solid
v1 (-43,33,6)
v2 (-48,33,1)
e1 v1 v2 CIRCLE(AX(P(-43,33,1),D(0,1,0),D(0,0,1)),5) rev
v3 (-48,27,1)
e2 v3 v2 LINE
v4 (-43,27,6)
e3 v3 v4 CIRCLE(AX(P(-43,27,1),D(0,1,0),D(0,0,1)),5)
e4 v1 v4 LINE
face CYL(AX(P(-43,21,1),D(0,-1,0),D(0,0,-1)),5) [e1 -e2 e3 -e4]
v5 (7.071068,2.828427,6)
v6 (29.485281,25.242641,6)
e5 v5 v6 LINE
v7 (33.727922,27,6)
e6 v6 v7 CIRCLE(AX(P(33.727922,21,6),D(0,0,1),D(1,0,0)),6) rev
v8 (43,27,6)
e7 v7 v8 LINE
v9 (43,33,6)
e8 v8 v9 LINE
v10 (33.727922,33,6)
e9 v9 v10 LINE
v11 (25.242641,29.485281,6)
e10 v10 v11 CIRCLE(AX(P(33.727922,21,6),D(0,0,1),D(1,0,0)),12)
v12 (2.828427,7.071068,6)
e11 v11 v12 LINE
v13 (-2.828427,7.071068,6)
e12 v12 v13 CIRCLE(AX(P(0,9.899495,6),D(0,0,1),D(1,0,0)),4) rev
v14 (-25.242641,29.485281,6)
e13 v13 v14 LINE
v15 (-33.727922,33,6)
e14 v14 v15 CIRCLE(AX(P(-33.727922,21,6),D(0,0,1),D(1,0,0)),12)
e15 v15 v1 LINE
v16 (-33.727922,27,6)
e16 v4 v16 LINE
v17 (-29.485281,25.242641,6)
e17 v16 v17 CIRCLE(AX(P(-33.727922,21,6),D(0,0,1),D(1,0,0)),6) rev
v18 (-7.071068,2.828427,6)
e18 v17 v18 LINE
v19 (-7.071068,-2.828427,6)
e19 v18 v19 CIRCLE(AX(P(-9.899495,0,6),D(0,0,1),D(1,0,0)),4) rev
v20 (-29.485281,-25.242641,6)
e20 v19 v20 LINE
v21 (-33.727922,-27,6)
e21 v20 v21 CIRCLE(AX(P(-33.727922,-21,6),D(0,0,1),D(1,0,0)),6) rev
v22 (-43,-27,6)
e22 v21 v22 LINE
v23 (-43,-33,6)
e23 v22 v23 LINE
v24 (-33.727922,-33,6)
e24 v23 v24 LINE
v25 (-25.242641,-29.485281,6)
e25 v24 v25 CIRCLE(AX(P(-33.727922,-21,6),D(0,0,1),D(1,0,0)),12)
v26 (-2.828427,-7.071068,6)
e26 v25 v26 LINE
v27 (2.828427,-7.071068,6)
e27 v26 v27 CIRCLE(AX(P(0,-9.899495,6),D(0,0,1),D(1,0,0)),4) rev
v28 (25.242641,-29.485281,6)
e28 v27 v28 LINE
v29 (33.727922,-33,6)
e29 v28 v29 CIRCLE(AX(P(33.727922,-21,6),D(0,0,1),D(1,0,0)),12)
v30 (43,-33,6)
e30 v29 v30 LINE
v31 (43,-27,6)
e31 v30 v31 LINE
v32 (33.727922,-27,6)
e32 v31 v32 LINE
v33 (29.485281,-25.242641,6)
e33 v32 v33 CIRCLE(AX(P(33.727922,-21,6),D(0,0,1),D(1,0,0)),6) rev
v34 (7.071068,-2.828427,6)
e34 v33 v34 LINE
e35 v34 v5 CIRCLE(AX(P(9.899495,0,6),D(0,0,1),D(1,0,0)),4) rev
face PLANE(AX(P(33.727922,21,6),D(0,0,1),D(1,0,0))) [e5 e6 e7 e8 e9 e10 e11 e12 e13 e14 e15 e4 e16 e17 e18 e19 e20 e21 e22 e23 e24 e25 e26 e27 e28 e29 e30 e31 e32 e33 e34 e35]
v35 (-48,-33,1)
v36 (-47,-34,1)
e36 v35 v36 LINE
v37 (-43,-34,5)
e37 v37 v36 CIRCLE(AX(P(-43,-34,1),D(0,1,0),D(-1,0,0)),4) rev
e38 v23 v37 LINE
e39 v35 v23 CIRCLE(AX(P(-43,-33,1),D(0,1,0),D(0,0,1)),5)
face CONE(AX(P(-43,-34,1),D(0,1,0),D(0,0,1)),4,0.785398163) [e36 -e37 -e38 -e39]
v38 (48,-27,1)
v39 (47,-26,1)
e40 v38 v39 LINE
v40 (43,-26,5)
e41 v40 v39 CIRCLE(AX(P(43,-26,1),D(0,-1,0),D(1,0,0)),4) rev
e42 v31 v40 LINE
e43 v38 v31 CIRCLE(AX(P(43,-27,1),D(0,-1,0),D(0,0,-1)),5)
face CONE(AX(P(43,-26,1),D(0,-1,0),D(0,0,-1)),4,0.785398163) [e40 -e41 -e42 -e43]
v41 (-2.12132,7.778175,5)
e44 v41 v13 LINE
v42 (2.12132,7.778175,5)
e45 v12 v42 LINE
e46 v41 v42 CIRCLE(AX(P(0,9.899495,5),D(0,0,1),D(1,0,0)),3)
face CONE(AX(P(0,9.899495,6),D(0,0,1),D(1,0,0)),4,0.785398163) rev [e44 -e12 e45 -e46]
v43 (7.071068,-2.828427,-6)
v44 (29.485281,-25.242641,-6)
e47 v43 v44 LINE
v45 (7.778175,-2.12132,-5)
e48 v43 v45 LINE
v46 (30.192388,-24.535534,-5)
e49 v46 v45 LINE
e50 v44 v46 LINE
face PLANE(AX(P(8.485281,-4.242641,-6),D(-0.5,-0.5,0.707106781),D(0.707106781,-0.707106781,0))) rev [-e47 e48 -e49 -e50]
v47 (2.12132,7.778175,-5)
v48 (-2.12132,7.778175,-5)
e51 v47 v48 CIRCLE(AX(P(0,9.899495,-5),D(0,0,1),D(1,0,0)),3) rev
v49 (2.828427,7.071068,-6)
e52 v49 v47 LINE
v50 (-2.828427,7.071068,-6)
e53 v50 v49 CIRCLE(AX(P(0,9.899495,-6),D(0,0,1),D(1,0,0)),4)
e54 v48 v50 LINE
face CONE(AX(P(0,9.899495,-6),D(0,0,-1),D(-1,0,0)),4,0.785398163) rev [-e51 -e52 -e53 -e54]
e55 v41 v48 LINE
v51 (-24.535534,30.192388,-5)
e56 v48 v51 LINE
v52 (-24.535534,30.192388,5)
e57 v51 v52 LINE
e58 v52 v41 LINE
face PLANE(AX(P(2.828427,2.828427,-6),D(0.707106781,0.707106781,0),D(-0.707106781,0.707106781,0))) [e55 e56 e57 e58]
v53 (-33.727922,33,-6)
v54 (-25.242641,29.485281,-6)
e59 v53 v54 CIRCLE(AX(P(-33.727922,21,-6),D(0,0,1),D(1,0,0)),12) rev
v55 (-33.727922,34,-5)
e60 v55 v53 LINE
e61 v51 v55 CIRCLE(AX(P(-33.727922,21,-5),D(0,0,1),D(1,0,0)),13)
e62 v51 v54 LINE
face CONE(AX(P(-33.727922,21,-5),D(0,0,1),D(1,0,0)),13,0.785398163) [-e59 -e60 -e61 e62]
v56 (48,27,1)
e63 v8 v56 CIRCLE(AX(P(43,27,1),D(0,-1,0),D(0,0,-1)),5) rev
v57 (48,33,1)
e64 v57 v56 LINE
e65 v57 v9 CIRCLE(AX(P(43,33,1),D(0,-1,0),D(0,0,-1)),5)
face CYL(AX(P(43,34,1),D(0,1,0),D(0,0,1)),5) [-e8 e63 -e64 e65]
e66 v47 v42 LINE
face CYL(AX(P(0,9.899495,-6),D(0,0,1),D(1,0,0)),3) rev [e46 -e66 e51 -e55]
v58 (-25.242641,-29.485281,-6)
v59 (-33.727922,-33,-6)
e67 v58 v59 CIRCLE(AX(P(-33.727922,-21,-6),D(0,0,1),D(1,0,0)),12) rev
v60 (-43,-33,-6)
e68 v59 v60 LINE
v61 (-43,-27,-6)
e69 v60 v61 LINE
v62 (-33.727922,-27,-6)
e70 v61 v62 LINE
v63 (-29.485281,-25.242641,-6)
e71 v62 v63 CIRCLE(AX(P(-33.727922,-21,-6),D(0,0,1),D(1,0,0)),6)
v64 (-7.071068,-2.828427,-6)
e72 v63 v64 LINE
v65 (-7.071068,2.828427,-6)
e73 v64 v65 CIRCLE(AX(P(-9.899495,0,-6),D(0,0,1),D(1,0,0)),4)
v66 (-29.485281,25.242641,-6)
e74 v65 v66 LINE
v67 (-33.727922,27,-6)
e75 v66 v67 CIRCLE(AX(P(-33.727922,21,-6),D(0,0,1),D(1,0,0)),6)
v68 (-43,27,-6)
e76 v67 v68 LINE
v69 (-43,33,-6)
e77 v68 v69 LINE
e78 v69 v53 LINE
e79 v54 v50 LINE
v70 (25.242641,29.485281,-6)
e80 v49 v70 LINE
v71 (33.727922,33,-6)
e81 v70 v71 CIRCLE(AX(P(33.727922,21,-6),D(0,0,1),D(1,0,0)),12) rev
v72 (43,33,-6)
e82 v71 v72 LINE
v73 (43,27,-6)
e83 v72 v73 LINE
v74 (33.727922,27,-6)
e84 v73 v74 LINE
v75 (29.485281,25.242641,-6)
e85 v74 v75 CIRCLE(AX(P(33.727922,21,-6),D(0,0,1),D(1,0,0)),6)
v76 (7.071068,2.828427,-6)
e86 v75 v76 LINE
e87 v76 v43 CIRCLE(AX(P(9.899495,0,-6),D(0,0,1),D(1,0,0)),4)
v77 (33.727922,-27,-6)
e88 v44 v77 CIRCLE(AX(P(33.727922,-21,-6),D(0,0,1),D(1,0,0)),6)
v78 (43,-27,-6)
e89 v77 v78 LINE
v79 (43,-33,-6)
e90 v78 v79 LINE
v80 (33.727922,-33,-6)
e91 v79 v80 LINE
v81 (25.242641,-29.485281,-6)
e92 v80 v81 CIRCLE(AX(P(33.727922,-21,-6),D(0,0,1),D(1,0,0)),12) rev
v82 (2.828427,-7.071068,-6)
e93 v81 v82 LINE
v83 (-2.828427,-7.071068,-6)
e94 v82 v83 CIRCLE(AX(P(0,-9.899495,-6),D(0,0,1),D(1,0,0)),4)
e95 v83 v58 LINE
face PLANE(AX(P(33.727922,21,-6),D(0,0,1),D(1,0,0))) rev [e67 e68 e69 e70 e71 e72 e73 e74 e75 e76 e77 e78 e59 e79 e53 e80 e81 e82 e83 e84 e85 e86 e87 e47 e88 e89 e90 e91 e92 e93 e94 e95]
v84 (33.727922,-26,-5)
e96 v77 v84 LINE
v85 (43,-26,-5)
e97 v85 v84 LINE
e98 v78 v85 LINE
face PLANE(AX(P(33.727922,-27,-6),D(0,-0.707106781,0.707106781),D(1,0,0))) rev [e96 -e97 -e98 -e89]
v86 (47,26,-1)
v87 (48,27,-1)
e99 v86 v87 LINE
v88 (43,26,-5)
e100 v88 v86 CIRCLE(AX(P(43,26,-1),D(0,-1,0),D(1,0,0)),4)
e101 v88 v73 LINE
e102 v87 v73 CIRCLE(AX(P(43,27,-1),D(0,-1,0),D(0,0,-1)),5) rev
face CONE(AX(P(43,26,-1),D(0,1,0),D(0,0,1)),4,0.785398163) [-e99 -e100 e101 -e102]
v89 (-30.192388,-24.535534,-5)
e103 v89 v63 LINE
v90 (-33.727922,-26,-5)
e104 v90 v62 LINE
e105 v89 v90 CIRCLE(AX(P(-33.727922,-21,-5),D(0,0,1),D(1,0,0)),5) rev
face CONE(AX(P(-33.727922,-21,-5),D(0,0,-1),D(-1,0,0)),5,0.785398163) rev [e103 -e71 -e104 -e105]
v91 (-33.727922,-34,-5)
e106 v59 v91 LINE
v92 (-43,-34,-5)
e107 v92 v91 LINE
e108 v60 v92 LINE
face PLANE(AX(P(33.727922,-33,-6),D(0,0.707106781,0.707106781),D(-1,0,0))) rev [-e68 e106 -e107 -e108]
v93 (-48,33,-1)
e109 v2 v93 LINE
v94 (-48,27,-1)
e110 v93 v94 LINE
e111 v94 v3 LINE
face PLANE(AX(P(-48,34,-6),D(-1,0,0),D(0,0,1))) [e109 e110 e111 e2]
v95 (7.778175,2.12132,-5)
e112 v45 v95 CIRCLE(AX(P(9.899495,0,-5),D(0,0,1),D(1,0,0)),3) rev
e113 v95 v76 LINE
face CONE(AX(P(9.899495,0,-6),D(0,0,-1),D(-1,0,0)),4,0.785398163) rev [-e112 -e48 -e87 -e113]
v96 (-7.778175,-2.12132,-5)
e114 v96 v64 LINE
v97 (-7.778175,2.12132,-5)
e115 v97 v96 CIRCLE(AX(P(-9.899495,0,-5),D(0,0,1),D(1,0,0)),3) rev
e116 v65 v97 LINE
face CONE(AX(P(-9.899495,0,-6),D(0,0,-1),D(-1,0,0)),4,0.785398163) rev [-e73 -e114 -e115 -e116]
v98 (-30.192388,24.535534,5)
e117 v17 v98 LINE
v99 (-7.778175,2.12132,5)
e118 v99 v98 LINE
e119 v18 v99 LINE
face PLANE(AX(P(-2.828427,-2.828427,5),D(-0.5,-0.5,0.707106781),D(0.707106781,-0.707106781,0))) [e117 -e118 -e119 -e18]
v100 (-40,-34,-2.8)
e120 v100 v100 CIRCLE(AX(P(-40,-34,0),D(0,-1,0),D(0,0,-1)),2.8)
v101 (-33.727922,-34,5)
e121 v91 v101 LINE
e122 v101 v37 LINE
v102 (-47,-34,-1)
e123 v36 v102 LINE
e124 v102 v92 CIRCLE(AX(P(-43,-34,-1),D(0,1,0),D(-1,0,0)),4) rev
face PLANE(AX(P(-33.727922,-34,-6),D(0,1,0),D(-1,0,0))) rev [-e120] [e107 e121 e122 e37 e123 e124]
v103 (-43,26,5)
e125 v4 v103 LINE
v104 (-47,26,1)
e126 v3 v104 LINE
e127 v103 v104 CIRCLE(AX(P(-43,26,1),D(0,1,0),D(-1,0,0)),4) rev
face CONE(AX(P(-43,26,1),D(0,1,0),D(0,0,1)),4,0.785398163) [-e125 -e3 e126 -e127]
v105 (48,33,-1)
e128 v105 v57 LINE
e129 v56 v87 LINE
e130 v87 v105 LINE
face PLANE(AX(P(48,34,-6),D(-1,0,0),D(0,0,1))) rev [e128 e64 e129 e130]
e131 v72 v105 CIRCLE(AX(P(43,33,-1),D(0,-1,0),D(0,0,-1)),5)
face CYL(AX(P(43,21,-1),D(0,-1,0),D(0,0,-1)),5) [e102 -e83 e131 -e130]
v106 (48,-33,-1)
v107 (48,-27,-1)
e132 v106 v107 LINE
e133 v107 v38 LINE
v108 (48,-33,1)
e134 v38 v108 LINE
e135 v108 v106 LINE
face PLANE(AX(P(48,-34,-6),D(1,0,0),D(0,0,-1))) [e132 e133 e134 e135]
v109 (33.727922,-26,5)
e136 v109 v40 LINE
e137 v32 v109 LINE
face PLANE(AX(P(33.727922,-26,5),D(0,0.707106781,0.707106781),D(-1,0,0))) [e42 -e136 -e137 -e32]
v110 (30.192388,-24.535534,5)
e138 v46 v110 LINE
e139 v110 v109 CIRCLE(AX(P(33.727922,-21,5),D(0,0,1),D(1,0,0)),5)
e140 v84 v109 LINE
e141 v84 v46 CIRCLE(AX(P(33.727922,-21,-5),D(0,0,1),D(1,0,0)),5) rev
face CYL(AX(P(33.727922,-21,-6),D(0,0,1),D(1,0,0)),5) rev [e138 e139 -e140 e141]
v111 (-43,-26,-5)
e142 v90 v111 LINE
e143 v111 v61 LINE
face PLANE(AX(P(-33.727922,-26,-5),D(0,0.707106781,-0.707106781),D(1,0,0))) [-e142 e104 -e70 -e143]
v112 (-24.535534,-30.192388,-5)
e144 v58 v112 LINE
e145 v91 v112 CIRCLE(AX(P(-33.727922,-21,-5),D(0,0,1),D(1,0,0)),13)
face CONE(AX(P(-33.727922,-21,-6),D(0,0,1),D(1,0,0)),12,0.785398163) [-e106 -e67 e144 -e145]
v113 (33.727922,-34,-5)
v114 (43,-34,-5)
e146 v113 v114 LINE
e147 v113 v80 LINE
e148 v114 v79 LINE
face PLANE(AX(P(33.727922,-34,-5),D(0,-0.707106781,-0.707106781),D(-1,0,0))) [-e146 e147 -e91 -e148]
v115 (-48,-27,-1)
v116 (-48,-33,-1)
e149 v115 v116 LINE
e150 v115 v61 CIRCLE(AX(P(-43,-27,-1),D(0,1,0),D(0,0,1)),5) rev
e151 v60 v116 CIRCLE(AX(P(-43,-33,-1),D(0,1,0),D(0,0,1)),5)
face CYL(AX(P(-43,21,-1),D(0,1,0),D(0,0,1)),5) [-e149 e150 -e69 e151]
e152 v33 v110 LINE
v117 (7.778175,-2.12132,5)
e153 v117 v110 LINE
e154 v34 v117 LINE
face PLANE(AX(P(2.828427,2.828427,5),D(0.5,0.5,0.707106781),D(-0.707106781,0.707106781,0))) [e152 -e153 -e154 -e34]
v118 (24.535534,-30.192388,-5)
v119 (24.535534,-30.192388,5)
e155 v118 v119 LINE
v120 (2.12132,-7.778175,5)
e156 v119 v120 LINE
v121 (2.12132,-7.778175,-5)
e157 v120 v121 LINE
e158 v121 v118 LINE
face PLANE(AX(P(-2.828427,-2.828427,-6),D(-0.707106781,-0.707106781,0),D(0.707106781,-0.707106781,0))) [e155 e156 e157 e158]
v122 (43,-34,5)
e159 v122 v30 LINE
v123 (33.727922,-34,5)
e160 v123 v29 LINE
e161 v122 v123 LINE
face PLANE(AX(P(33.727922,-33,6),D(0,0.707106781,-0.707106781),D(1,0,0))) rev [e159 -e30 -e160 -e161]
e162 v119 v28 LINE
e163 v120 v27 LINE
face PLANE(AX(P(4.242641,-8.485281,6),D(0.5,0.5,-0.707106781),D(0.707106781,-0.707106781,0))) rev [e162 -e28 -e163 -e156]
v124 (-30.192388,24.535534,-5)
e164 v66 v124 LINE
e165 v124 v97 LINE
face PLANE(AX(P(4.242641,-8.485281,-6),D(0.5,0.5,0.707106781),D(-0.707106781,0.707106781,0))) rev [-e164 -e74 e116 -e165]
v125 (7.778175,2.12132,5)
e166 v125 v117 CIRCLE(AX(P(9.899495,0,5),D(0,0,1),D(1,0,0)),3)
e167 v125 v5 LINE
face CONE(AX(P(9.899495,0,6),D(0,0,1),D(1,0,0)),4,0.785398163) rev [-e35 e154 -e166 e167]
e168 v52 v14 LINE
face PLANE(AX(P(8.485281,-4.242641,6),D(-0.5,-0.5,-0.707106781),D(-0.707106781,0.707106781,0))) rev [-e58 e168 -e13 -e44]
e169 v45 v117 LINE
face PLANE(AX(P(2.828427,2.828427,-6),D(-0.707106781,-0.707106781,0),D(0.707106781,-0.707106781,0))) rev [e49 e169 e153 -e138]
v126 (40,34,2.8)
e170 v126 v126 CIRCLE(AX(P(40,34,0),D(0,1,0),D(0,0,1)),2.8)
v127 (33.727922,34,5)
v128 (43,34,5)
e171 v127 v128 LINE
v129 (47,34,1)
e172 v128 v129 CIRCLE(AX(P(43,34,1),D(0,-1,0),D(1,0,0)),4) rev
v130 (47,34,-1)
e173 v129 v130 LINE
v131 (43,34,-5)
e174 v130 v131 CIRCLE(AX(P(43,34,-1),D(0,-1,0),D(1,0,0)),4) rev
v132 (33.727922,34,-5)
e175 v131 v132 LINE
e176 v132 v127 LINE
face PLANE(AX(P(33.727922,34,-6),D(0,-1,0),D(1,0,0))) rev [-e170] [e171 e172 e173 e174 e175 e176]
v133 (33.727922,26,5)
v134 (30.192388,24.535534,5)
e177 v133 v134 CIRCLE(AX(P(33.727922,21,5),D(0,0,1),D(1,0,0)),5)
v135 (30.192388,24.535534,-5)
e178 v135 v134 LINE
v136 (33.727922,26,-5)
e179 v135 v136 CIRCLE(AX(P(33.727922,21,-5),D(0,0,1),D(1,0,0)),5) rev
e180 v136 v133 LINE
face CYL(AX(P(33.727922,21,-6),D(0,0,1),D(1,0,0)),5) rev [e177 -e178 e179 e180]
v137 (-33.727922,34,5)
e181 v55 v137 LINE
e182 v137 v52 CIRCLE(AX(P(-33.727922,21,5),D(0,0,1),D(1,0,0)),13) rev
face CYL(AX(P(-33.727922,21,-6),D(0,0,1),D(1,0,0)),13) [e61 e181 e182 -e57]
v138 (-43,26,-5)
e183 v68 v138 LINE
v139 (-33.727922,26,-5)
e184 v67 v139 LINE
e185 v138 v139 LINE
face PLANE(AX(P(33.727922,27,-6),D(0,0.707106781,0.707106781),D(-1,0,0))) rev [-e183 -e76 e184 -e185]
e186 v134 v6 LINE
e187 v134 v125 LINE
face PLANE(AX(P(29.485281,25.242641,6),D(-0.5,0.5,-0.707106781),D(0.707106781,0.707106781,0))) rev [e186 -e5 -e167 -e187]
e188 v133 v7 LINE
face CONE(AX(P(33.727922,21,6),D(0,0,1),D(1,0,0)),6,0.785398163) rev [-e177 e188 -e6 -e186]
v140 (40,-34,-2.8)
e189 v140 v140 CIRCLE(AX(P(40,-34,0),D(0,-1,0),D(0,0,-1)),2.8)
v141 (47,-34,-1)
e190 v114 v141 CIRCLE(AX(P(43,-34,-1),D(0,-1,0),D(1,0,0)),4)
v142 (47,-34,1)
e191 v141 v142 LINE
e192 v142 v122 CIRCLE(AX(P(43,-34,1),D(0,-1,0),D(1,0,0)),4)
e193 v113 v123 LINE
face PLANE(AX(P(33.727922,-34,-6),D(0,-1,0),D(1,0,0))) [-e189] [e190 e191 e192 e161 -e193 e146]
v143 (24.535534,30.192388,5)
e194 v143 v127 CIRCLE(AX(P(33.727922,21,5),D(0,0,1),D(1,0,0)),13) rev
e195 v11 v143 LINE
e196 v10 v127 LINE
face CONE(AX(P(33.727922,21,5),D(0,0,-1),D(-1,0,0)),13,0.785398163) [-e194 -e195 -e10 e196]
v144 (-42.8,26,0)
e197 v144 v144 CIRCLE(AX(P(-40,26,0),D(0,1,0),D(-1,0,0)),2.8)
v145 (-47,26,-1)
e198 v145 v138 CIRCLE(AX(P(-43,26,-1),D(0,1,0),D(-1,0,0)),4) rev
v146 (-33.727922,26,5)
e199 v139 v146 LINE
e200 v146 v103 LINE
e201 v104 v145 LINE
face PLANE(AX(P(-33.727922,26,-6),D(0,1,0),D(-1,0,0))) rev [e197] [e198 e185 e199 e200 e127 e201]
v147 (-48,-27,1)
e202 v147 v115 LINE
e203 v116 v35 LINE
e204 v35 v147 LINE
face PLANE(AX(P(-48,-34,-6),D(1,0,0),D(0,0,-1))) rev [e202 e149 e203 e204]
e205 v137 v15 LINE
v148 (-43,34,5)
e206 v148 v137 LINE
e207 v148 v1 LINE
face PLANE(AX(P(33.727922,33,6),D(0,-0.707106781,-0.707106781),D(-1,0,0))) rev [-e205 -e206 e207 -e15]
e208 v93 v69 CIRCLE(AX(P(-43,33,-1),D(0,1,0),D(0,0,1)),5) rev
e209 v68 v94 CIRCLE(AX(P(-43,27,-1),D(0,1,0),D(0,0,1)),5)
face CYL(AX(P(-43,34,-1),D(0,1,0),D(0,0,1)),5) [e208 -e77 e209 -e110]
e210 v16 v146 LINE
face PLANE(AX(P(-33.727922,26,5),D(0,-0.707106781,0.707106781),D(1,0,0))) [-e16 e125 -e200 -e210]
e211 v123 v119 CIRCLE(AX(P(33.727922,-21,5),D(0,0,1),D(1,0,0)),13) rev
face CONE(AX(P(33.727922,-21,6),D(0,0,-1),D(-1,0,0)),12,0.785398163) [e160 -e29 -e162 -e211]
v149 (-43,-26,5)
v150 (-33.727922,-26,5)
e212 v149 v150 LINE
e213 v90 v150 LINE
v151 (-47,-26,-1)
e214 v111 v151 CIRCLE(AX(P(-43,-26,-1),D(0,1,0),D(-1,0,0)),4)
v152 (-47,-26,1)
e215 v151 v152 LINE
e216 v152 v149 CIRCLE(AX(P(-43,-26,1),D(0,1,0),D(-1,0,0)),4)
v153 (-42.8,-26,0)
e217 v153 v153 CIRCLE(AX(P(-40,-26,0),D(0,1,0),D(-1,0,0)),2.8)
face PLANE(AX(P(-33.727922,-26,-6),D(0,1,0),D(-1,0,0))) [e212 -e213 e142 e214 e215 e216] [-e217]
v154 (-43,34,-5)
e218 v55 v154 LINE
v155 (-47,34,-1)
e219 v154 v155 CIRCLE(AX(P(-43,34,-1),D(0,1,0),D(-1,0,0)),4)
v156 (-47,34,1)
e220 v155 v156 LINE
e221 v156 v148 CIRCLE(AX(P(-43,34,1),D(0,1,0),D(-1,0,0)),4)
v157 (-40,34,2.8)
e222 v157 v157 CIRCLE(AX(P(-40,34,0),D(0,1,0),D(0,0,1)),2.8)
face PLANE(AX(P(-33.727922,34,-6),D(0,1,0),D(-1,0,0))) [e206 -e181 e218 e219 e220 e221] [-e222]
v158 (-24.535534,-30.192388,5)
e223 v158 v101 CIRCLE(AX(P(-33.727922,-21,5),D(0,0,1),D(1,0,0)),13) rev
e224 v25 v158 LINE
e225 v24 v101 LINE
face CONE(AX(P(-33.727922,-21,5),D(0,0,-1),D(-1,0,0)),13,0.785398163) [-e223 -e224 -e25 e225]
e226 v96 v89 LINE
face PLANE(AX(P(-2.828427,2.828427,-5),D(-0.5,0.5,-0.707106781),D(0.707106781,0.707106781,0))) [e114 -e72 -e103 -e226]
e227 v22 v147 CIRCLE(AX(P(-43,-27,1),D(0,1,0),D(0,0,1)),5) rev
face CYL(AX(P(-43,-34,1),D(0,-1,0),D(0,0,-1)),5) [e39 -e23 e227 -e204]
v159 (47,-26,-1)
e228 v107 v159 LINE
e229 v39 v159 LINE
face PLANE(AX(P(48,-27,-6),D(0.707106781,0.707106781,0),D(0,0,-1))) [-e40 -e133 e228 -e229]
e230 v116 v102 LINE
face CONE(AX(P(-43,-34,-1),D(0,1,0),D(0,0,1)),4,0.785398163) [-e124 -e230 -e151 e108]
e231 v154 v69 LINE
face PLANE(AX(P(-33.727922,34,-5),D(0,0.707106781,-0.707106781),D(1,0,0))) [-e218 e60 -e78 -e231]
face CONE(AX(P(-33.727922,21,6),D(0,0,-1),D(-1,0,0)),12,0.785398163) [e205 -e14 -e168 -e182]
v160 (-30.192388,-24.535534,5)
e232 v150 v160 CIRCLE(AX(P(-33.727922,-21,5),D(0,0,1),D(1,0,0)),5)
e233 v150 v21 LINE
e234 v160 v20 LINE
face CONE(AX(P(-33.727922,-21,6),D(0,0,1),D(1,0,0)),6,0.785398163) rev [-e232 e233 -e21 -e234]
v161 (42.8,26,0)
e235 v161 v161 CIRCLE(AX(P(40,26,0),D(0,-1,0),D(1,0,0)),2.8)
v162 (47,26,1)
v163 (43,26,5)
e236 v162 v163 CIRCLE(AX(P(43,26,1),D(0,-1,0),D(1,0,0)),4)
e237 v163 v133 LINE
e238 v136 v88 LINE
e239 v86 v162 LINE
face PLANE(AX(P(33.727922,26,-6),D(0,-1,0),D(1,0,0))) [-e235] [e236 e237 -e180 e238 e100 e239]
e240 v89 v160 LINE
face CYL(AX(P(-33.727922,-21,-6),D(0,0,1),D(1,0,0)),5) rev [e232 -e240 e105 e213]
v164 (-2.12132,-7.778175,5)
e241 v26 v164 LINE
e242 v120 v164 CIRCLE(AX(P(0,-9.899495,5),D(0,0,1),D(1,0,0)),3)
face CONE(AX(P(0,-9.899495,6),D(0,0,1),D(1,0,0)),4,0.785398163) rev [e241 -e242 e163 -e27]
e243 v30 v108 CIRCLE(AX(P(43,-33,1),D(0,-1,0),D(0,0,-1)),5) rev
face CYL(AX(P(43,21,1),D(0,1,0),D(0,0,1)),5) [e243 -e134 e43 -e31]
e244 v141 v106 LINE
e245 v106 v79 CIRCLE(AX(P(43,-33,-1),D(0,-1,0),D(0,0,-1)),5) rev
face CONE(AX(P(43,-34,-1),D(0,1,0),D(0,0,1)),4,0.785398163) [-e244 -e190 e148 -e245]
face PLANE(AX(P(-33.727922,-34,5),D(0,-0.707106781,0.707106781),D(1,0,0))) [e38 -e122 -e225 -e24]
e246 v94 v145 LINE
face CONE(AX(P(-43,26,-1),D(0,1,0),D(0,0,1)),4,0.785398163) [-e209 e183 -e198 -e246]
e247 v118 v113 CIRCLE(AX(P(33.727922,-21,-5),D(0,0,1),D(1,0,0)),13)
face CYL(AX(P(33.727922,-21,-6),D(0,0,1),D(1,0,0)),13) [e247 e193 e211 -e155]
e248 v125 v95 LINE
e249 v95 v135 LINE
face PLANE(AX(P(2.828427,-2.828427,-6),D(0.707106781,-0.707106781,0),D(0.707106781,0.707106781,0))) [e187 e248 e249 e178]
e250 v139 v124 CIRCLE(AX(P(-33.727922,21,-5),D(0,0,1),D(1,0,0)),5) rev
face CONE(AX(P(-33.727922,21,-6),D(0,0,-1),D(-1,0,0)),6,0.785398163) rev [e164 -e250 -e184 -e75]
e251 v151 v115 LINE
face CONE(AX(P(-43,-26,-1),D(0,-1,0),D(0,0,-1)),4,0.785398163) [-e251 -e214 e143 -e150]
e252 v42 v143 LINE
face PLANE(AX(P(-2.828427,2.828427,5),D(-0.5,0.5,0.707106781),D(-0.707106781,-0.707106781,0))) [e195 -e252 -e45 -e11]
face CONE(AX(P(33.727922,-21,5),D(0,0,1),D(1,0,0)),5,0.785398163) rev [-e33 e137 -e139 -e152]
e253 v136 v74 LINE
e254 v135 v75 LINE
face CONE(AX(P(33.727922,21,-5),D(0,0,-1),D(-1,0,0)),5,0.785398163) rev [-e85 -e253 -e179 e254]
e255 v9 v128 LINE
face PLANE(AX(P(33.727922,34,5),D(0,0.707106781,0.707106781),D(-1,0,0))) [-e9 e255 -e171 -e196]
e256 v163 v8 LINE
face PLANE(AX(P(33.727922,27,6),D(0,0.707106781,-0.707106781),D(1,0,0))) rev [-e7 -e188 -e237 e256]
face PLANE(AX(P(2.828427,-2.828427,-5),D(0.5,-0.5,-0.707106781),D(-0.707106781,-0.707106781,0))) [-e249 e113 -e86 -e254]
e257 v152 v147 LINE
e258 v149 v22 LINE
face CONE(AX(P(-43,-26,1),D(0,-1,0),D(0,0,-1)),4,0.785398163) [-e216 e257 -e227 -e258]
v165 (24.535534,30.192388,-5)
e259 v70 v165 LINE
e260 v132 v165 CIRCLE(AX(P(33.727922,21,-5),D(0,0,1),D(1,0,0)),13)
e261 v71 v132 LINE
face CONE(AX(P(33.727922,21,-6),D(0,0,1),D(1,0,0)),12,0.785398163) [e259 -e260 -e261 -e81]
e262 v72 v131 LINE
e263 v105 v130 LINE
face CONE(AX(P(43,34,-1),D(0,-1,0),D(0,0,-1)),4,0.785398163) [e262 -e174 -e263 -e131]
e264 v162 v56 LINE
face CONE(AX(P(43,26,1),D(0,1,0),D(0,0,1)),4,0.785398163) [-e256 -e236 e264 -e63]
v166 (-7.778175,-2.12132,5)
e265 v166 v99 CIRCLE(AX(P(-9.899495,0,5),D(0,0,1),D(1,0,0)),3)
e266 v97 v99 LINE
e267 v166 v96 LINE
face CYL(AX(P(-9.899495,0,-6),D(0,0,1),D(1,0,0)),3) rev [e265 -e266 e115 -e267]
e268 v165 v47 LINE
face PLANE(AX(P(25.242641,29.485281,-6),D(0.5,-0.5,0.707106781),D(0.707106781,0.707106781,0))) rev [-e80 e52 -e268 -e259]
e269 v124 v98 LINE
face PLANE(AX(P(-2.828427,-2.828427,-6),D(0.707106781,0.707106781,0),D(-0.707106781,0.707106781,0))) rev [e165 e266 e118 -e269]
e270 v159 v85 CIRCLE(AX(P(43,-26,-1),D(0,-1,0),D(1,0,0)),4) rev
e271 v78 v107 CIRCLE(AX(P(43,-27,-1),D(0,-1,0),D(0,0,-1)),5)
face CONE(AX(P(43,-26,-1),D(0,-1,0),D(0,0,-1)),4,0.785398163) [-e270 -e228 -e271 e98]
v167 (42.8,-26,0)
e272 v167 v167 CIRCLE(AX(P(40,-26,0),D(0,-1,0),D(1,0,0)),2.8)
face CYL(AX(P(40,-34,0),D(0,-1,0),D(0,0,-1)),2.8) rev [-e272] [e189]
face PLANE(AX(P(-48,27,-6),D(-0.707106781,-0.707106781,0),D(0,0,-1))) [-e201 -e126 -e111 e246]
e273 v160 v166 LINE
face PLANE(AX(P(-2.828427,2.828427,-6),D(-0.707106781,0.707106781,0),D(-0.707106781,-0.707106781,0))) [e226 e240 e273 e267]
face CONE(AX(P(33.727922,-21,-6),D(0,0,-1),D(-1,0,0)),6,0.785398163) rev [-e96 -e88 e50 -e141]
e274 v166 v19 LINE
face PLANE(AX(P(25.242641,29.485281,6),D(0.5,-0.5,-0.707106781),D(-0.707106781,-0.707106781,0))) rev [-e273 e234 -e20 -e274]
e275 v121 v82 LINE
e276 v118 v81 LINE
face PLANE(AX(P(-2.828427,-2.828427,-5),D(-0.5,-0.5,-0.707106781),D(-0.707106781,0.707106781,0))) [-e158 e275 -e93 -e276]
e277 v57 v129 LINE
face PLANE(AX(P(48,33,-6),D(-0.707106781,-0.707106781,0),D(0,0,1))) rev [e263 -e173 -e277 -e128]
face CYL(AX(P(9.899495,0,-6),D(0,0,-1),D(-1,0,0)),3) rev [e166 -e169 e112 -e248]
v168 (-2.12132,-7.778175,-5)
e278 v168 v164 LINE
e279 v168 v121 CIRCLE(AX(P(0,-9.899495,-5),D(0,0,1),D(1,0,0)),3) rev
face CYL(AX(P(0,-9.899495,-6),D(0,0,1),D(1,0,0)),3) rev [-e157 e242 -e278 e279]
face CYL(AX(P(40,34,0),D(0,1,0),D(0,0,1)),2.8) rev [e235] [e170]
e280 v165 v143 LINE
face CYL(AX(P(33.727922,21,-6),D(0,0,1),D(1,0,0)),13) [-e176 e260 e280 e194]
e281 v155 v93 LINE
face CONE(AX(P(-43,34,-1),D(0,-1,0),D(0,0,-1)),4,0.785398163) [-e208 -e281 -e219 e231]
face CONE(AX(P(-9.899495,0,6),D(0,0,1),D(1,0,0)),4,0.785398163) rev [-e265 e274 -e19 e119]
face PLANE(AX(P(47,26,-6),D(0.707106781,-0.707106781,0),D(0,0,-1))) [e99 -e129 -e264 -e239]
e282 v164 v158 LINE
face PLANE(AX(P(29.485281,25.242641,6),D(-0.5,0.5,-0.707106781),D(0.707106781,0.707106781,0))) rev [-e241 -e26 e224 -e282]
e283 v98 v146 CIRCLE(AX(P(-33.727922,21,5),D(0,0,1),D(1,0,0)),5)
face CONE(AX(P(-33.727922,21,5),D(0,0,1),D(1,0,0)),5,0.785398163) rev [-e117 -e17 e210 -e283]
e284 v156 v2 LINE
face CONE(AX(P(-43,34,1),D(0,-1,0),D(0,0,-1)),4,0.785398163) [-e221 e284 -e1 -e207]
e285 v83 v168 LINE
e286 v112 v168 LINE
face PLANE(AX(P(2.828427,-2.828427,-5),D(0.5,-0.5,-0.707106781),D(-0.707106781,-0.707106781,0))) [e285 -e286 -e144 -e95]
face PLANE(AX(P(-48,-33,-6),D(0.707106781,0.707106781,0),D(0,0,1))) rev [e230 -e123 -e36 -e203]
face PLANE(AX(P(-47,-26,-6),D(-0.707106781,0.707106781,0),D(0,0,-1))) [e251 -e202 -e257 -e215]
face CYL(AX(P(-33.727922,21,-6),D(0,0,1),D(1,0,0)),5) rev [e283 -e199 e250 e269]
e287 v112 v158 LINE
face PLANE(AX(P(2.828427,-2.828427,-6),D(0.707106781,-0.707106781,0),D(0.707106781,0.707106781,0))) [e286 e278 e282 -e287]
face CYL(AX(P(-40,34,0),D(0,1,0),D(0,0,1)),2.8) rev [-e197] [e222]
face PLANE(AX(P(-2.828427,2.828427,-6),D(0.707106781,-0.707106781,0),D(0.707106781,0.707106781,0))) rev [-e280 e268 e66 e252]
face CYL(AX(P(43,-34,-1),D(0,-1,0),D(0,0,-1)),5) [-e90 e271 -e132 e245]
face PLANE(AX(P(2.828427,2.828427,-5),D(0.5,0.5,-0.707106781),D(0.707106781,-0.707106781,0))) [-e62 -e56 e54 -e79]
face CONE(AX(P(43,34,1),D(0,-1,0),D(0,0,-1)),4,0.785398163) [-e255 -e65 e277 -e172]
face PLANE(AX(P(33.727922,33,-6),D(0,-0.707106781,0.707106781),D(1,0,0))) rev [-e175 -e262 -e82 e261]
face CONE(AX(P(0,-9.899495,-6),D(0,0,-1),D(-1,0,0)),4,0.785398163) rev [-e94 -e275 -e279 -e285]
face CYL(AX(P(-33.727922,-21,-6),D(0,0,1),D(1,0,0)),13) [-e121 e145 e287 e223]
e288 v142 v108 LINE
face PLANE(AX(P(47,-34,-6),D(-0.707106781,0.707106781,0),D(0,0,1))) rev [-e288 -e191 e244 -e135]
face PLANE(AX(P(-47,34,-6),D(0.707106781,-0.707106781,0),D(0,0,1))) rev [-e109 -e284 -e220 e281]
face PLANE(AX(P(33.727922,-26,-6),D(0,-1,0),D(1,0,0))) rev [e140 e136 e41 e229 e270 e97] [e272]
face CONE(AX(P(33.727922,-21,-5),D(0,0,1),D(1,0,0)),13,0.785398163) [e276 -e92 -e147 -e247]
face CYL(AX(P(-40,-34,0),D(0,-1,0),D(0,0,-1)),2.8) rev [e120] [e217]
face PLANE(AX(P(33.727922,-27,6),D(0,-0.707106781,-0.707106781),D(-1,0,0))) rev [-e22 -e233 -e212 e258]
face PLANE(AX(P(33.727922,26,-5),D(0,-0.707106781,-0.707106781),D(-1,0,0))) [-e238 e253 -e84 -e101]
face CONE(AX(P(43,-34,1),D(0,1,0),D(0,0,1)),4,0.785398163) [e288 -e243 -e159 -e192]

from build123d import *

# Parameters (mm, degrees)
EXTRUIR_L_MINA1_DEPTH    = 6
TALADRO1_D               = 5.6
TALADRO1_DEPTH           = 68
REDONDEO1_R              = 5
REDONDEO1_OF_SIMETR_A1_R = 5
REDONDEO3_R              = 3
CHAFL_N4_SIZE            = 1


# Read off the part's stored shape, not the designer's step: Simetría2
with BuildPart() as part:
    # Croquis1 → Extruir-Lámina1 (new, symmetric)
    with BuildSketch(Plane.XY):
        with BuildLine():
            Line((2.828427125, -2.828427125), (30.192388155, 24.535533906))
            ThreePointArc((30.192388155, 24.535533906), (31.8145049, 25.619397663), (33.727922061, 26))
            Line((33.727922061, 26), (48, 26))
            Line((48, 26), (48, 34))
            Line((48, 34), (33.727922061, 34))
            ThreePointArc((33.727922061, 34), (28.753037441, 33.010433923), (24.535533906, 30.192388155))
            Line((24.535533906, 30.192388155), (-2.828427125, 2.828427125))
            Line((-2.828427125, 2.828427125), (2.828427125, -2.828427125))
        make_face()
    extruir_l_mina1 = extrude(amount=EXTRUIR_L_MINA1_DEPTH, both=True)

    # Taladro1
    with Locations(Plane(origin=(0, 34, 0), x_dir=(1, 0, 0), z_dir=(0, 1, 0))):
        with Locations((40, 0)):
            taladro1 = Hole(TALADRO1_D / 2, depth=TALADRO1_DEPTH)

    # Redondeo1
    redondeo1_edges = [part.edges().sort_by_distance(p)[0] for p in [
        (48, 30, 6),
        (48, 30, -6),
    ]]
    fillet(redondeo1_edges, radius=REDONDEO1_R)

    # Simetría1: Extruir-Lámina1, Taladro1 across plane
    add(extruir_l_mina1.mirror(Plane(origin=(0, 0, 0), x_dir=(0, 0, 1), z_dir=(1, 0, 0))))
    add(taladro1.mirror(Plane(origin=(0, 0, 0), x_dir=(0, 0, 1), z_dir=(1, 0, 0))), mode=Mode.SUBTRACT)

    # Redondeo1 of Simetría1
    redondeo1_of_simetr_a1_edges = [part.edges().sort_by_distance(p)[0] for p in [
        (-48, 30, 6),
        (-48, 30, -6),
    ]]
    fillet(redondeo1_of_simetr_a1_edges, radius=REDONDEO1_OF_SIMETR_A1_R)

    # Simetría2: part across plane


with BuildPart() as part_1:
    add(part.part)
    add(part.part.mirror(Plane.ZX))

    # Redondeo3
    redondeo3_edges = [part_1.edges().sort_by_distance(p)[0] for p in [
        (-5.656854249, 0, 0),
        (5.656854249, 0, 0),
        (0, -5.656854249, 0),
        (0, 5.656854249, 0),
    ]]
    fillet(redondeo3_edges, radius=REDONDEO3_R)

    # Chaflán4
    chafl_n4_edges = [part_1.edges().sort_by_distance(p)[0] for p in [
        (38.363961031, 34, -6),
        (-38.363961031, -26, -6),
        (-31.8145049, -25.619397663, -6),
        (-28.753037441, -33.010433923, 6),
        (-38.363961031, -34, 6),
        (-28.753037441, -33.010433923, -6),
        (-38.363961031, -34, -6),
        (-31.8145049, -25.619397663, 6),
        (-38.363961031, -26, 6),
        (28.753037441, 33.010433923, -6),
        (-48, -26, 0),
        (-46.535533906, -26, 4.535533906),
        (-46.535533906, -26, -4.535533906),
        (-48, -34, 0),
        (-46.535533906, -34, 4.535533906),
        (-46.535533906, -34, -4.535533906),
        (38.363961031, -26, 6),
        (38.363961031, -34, -6),
        (28.753037441, -33.010433923, -6),
        (31.8145049, -25.619397663, 6),
        (31.8145049, -25.619397663, -6),
        (38.363961031, -26, -6),
        (28.753037441, -33.010433923, 6),
        (38.363961031, -34, 6),
        (48, -26, 0),
        (48, -34, 0),
        (38.363961031, 34, 6),
        (46.535533906, -26, 4.535533906),
        (46.535533906, -26, -4.535533906),
        (28.753037441, 33.010433923, 6),
        (46.535533906, -34, 4.535533906),
        (46.535533906, -34, -4.535533906),
        (13.328427125, -18.985281374, 6),
        (13.328427125, -18.985281374, -6),
        (18.985281374, 13.328427125, 6),
        (18.985281374, 13.328427125, -6),
        (18.985281374, -13.328427125, 6),
        (18.985281374, -13.328427125, -6),
        (-18.985281374, 13.328427125, -6),
        (-18.985281374, 13.328427125, 6),
        (-18.985281374, -13.328427125, -6),
        (38.363961031, 26, 6),
        (-18.985281374, -13.328427125, 6),
        (13.328427125, 18.985281374, -6),
        (13.328427125, 18.985281374, 6),
        (-13.328427125, 18.985281374, -6),
        (-13.328427125, -18.985281374, 6),
        (-13.328427125, 18.985281374, 6),
        (0, -6.899494937, -6),
        (0, -6.899494937, 6),
        (31.8145049, 25.619397663, 6),
        (6.899494937, 0, -6),
        (6.899494937, 0, 6),
        (-6.899494937, 0, 6),
        (-6.899494937, 0, -6),
        (0, 6.899494937, 6),
        (0, 6.899494937, -6),
        (-13.328427125, -18.985281374, -6),
        (31.8145049, 25.619397663, -6),
        (38.363961031, 26, -6),
        (48, 26, 0),
        (46.535533906, 26, 4.535533906),
        (46.535533906, 26, -4.535533906),
        (48, 34, 0),
        (46.535533906, 34, 4.535533906),
        (46.535533906, 34, -4.535533906),
        (-31.8145049, 25.619397663, -6),
        (-38.363961031, 26, -6),
        (-28.753037441, 33.010433923, 6),
        (-38.363961031, 34, 6),
        (-38.363961031, 26, 6),
        (-38.363961031, 34, -6),
        (-28.753037441, 33.010433923, -6),
        (-31.8145049, 25.619397663, 6),
        (-48, 26, 0),
        (-48, 34, 0),
        (-46.535533906, 26, 4.535533906),
        (-46.535533906, 26, -4.535533906),
        (-46.535533906, 34, 4.535533906),
        (-46.535533906, 34, -4.535533906),
    ]]
    chamfer(chafl_n4_edges, length=CHAFL_N4_SIZE)


solid = part_1.part
